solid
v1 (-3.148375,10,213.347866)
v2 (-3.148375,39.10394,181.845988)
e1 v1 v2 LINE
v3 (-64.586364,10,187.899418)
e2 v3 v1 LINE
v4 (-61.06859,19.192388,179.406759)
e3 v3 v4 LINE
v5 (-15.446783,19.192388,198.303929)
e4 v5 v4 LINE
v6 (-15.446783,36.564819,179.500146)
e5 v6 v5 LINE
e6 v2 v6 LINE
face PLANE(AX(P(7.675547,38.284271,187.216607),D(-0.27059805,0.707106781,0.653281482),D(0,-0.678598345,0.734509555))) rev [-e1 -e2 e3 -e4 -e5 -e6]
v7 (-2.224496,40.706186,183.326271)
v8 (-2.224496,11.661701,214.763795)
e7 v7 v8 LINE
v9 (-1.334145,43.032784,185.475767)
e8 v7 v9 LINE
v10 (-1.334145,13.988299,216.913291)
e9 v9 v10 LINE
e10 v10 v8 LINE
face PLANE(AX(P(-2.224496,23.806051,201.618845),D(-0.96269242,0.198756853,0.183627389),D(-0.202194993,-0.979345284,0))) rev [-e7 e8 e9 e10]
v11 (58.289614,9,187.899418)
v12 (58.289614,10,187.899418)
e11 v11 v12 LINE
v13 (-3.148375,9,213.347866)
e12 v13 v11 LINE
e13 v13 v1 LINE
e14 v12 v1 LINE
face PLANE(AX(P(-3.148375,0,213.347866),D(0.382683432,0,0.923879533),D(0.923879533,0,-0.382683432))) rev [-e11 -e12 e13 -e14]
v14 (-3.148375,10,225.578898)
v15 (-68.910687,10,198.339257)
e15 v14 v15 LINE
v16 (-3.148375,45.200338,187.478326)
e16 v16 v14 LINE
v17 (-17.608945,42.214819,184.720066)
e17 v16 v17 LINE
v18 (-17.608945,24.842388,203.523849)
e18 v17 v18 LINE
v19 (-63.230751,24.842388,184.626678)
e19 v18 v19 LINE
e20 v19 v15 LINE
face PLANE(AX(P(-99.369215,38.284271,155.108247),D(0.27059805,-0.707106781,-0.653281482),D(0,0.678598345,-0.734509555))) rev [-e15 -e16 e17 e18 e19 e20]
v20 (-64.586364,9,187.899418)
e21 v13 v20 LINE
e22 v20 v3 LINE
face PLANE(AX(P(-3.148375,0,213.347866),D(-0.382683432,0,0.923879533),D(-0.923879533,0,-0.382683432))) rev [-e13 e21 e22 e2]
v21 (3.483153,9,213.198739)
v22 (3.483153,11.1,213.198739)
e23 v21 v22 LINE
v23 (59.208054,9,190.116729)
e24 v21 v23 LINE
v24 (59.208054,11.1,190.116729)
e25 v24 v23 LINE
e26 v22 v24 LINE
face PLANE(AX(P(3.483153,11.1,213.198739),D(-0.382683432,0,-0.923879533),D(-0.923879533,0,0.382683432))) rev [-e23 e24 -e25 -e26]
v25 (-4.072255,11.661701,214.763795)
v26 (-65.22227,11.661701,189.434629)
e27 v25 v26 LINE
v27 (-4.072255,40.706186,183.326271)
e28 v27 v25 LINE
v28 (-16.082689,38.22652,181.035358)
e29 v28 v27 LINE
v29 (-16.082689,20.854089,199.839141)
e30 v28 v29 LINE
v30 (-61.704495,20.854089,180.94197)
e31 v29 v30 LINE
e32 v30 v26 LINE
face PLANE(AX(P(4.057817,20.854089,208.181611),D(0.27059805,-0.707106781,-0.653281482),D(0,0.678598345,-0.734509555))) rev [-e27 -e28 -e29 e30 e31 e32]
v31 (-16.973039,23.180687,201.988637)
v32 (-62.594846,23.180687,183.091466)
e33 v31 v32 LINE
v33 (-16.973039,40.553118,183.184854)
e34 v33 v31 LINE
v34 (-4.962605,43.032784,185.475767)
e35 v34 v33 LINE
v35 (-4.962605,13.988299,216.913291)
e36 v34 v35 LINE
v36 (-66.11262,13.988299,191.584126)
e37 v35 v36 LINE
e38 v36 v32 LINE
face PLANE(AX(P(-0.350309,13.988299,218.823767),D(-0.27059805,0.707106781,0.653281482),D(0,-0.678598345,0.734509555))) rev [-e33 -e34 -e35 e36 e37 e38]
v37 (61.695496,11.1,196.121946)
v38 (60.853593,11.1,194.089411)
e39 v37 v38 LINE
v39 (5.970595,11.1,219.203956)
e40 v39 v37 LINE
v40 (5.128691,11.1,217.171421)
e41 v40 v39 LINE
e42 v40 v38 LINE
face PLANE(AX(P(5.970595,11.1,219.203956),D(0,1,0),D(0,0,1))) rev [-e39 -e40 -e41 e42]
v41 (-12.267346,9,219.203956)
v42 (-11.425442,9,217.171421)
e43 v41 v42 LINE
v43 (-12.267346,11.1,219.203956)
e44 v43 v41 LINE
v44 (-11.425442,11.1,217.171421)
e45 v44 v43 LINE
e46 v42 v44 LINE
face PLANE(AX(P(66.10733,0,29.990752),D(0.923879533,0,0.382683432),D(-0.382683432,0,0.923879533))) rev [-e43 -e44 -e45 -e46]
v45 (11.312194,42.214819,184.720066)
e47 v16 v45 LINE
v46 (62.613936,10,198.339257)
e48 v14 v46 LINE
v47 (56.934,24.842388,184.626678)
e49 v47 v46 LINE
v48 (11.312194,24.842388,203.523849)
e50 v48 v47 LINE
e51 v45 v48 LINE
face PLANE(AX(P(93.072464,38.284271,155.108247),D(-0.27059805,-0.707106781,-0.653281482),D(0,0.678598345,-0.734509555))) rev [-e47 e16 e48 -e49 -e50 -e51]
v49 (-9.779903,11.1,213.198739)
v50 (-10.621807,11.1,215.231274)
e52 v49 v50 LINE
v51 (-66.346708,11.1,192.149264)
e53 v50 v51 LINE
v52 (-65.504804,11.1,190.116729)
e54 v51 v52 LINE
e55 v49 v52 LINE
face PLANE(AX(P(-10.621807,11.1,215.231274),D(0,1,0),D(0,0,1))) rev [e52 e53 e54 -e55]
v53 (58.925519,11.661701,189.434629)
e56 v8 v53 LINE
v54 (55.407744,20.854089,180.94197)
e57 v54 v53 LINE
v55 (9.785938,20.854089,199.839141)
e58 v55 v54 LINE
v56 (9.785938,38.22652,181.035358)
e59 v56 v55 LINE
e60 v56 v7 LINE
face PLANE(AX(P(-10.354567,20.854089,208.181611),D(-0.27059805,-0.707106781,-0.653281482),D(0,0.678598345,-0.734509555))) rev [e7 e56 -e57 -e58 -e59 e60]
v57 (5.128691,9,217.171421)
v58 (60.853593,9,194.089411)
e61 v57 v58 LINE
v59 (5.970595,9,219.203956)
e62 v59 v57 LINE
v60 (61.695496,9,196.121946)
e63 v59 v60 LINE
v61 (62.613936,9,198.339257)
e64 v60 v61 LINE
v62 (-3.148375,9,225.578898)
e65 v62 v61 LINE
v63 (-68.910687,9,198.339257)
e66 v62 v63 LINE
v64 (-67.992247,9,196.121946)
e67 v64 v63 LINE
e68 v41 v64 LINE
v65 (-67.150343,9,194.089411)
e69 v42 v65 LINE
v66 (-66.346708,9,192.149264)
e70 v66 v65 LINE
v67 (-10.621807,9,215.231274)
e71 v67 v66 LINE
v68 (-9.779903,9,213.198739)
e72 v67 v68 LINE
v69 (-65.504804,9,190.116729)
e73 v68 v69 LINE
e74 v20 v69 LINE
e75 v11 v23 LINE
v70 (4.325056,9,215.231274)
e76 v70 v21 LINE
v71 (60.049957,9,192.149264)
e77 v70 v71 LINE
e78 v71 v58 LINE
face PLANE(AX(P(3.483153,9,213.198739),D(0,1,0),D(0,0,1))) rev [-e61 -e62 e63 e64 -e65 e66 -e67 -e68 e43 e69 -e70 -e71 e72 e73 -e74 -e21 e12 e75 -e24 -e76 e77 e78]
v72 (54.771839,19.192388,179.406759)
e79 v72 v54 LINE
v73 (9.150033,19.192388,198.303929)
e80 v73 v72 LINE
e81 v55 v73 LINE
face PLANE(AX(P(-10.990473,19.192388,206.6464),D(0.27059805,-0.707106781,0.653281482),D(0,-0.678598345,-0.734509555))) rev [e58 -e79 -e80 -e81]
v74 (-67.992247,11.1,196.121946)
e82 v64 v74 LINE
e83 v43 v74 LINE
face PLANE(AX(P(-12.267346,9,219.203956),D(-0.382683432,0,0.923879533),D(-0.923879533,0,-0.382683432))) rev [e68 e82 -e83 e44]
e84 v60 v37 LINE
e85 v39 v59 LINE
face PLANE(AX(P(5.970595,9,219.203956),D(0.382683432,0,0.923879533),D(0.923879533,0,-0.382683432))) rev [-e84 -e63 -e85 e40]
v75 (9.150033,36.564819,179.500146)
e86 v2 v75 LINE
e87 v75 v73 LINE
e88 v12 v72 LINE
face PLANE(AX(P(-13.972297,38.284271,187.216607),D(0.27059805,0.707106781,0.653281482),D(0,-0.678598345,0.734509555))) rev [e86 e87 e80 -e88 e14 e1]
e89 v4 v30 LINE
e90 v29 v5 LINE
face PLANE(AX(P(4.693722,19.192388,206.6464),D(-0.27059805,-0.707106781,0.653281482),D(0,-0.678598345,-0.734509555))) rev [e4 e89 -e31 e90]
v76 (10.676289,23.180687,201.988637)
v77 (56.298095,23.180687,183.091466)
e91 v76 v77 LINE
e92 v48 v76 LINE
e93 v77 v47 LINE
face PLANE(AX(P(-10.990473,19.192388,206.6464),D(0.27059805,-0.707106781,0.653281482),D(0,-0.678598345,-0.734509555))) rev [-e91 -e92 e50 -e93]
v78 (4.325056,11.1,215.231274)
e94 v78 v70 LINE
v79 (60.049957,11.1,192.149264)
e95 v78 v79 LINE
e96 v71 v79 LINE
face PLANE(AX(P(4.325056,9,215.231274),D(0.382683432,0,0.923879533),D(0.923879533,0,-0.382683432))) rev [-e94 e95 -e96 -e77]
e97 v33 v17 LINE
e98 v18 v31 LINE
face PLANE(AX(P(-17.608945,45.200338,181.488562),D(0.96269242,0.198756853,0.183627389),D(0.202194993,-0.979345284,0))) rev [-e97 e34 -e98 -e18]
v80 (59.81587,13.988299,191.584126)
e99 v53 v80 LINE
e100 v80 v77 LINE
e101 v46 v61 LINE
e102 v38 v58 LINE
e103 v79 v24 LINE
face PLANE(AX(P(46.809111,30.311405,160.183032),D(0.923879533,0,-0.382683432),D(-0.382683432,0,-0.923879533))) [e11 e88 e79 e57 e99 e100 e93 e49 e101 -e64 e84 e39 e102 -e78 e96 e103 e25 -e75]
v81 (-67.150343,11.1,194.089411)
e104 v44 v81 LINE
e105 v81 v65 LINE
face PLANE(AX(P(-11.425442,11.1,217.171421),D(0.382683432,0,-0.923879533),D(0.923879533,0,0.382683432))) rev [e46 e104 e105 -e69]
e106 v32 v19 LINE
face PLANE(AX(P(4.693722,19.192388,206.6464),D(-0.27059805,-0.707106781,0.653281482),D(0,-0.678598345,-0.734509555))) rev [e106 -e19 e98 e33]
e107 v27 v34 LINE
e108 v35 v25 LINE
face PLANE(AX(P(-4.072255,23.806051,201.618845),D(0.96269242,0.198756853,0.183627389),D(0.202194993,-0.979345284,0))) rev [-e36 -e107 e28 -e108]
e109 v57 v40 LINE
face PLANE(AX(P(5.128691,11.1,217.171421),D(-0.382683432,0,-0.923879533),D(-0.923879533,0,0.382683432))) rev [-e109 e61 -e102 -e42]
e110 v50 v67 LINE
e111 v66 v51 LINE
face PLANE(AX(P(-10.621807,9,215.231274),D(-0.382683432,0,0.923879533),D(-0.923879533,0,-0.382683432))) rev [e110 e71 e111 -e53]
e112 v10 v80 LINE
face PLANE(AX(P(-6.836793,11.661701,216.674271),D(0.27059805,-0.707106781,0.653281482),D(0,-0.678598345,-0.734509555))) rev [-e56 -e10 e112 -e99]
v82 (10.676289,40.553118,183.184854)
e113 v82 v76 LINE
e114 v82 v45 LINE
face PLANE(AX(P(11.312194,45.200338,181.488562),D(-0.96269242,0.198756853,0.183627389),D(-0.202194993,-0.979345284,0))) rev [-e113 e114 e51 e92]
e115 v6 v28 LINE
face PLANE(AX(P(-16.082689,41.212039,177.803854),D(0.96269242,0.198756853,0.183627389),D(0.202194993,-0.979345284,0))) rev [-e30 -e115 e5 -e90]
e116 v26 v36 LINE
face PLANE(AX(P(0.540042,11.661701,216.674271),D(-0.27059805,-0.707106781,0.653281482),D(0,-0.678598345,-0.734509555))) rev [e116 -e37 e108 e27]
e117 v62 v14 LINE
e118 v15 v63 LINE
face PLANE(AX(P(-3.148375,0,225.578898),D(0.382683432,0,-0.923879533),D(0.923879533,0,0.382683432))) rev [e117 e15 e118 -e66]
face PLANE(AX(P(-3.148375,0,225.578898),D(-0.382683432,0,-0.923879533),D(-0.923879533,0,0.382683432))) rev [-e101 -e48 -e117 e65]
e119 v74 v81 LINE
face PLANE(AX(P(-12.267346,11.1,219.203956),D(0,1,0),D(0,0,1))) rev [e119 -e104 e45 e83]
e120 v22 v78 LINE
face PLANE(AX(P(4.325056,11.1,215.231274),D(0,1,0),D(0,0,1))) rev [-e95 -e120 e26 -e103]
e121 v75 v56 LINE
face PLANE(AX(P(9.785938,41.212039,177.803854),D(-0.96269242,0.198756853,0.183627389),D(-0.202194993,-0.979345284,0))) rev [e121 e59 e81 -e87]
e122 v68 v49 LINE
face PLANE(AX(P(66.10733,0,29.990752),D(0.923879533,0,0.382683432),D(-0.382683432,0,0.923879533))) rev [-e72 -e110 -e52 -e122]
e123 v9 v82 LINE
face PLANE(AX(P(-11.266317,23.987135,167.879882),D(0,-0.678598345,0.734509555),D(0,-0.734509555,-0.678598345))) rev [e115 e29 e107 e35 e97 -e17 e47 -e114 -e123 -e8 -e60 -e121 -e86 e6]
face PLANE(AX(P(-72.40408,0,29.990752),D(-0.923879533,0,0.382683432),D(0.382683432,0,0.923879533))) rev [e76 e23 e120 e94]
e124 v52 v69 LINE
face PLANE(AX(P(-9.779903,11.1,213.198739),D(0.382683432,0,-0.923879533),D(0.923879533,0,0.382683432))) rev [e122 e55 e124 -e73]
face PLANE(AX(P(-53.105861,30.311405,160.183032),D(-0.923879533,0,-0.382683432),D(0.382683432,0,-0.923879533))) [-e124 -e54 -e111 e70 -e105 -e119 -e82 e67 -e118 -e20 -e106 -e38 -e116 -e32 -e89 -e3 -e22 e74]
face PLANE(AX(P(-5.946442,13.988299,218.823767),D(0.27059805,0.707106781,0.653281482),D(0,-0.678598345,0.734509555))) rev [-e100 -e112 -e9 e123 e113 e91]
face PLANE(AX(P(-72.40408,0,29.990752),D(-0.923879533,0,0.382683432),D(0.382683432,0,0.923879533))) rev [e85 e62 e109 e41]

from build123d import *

# Parameters (mm, degrees)
SKETCH1_W                = 214.089522673
SKETCH1_H                = 271.033566845
BOSS_EXTRUDE1_DEPTH      = 10
SKETCH3_W                = 107.044761337
SKETCH3_H                = 271.033566845
CUT_EXTRUDE1_DEPTH       = 252.253590179
CUT_EXTRUDE2_DEPTH       = 249.55642867
BOSS_EXTRUDE3_DEPTH      = 40
CUT_EXTRUDE3_START       = -165.689856025
CUT_EXTRUDE3_DEPTH       = 205.862728092
CUT_EXTRUDE4_DEPTH       = 250.960593361
CUT_EXTRUDE5_DEPTH       = 250.960593361
BOSS_EXTRUDE5_DEPTH      = 45
CUT_EXTRUDE7_DEPTH       = 253.784190336
CUT_EXTRUDE9_DEPTH       = 253.784190336
CUT_EXTRUDE10_DEPTH      = 105
BOSS_EXTRUDE6_DEPTH      = 13.546139965
BOSS_EXTRUDE7_DEPTH      = 30
CUT_EXTRUDE12_DEPTH      = 30
SKETCH30_W               = 11.3
SKETCH30_H               = 54
CUT_EXTRUDE13_DEPTH      = 30
CUT_EXTRUDE14_DEPTH      = 30
CUT_EXTRUDE14_DEPTH_BACK = 101.665148292
SKETCH31_W               = 44.683801498
SKETCH31_H               = 21.311404518


with BuildPart() as part:
    # Sketch1 → Boss-Extrude1 (new body)
    with BuildSketch(Plane(origin=(0, 0, 0), x_dir=(1, 0, 0), z_dir=(0, 1, 0))):
        with Locations((-3.148375333, -90.062114546)):
            Rectangle(SKETCH1_W, SKETCH1_H)
    extrude(amount=BOSS_EXTRUDE1_DEPTH)

    # Sketch3 → Cut-Extrude1 (cut, through all)
    with BuildSketch(Plane(origin=(0, 10, 0), x_dir=(1, 0, 0), z_dir=(0, 1, 0))):
        with Locations((-56.670756002, -90.062114546)):
            Rectangle(SKETCH3_W, SKETCH3_H)
    extrude(amount=-CUT_EXTRUDE1_DEPTH, mode=Mode.SUBTRACT)

    # Sketch4 → Cut-Extrude2 (cut, through all)
    with BuildSketch(Plane(origin=(0, 10, 0), x_dir=(1, 0, 0), z_dir=(0, 1, 0))):
        Polygon((103.896386003, -181.239506042), (100.834918545, -173.848469781), (9.996584241, 45.454668877), (103.896386003, 45.454668877), align=None)
    extrude(amount=-CUT_EXTRUDE2_DEPTH, mode=Mode.SUBTRACT)

    # Sketch6 → Boss-Extrude3 (add, along a direction that is not the sketch's normal)
    with BuildSketch(Plane(origin=(0, 10, 0), x_dir=(1, 0, 0), z_dir=(0, 1, 0))):
        Polygon((99.572063218, -170.799667324), (103.896386003, -181.239506042), (-3.148375333, -225.578897968), (-3.148375333, -213.347866105), align=None)
    extrude(amount=BOSS_EXTRUDE3_DEPTH, dir=(-0.2705980500730979, 0.7071067811865489, -0.6532814824381872))

    # Cut-Extrude3: read off the stored shape, not the designer's step
    # Cut-Extrude3 outline → Cut-Extrude3 (cut)
    with BuildSketch(Plane(origin=(0, 0, 0), x_dir=(1, 0, 0), z_dir=(0, 0.6785983445458481, -0.7345095552677544)).offset(CUT_EXTRUDE3_START)):
        Polygon((-3.148375333, -165), (-3.148375333, -152.122604304), (-13.972297336, -155.165042499), (-15, -155.45391393), (-15, -165), align=None)
    extrude(amount=CUT_EXTRUDE3_DEPTH, mode=Mode.SUBTRACT)

    # Sketch8 → Cut-Extrude4 (cut, through all)
    with BuildSketch(Plane(origin=(0, 10, 0), x_dir=(1, 0, 0), z_dir=(0, 1, 0))):
        Polygon((-3.148375333, -225.578897968), (103.896386003, -181.239506042), (103.896386003, -225.578897968), align=None)
    extrude(amount=-CUT_EXTRUDE4_DEPTH, mode=Mode.SUBTRACT)

    # Sketch9 → Cut-Extrude5 (cut, through all)
    with BuildSketch(Plane(origin=(0, 10, 0), x_dir=(1, 0, 0), z_dir=(0, 1, 0))):
        Polygon((-3.148375333, -213.347866105), (99.572063218, -170.799667324), (9.996584241, 45.454668877), (-3.148375333, 45.454668877), align=None)
    extrude(amount=-CUT_EXTRUDE5_DEPTH, mode=Mode.SUBTRACT)

    # Sketch13 → Boss-Extrude5 (add)
    with BuildSketch(Plane.XZ):
        Polygon((-3.148375333, 225.578897968), (-3.148375333, 213.347866105), (99.572063218, 170.799667324), (103.896386003, 181.239506042), align=None)
    extrude(amount=BOSS_EXTRUDE5_DEPTH)

    # Sketch14 → Cut-Extrude7 (cut, through all)
    with BuildSketch(Plane(origin=(24.603270673, 0, -10.191008392), x_dir=(-0.38268343236508967, 0, -0.9238795325112868), z_dir=(0.9238795325112867, 0, -0.3826834323650896))):
        Polygon((-178.918624473, 38.284271247), (-173.268624473, 32.634271247), (-167.618624473, 38.284271247), align=None)
    extrude(amount=-CUT_EXTRUDE7_DEPTH, mode=Mode.SUBTRACT)

    # Sketch21 → Cut-Extrude9 (cut, through all)
    with BuildSketch(Plane(origin=(24.603270673, 0, -10.191008392), x_dir=(-0.38268343236508967, 0, -0.9238795325112868), z_dir=(0.9238795325112867, 0, -0.3826834323650896))):
        Polygon((-178.918624473, 38.284271247), (-173.268624473, 32.634271247), (-186.710507565, 19.192388155), (-188.372208501, 20.854089091), (-197.564596656, 11.661700936), (-199.891194785, 13.988299064), (-190.698806629, 23.18068722), (-192.360507565, 24.842388155), align=None)
    extrude(amount=-CUT_EXTRUDE9_DEPTH, mode=Mode.SUBTRACT)

    # Sketch26 → Cut-Extrude10 (cut)
    with BuildSketch(Plane(origin=(24.603270673, 0, -10.191008392), x_dir=(-0.38268343236508967, 0, -0.9238795325112868), z_dir=(0.9238795325112867, 0, -0.3826834323650896))):
        Polygon((-195.90289572, 9), (-195.90289572, -45), (-207.20289572, -45), (-207.20289572, 9), (-204.80289572, 9), (-204.80289572, 11.1), (-202.60289572, 11.1), (-202.60289572, 9), (-200.50289572, 9), (-200.50289572, 11.1), (-198.30289572, 11.1), (-198.30289572, 9), align=None)
    extrude(amount=-CUT_EXTRUDE10_DEPTH, mode=Mode.SUBTRACT)

    # Sketch27 → Boss-Extrude6 (add, along a direction that is not the sketch's normal)
    with BuildSketch(Plane(origin=(35.57097911, -92.95144786, 85.875940195), x_dir=(0.9626924198811571, 0.19875685341551327, -0.18362738881693624), z_dir=(-0.2705980500730966, 0.7071067811865525, -0.6532814824381838))):
        Polygon((-40.219860097, -165.940754997), (-39.260177115, -165.659670359), (-38.335322468, -168.817321636), (-40.219860097, -169.369289928), align=None)
    extrude(amount=BOSS_EXTRUDE6_DEPTH, dir=(0, 0.6785983445458494, -0.7345095552677533))

    # Sketch28 → Boss-Extrude7 (add, along a direction that is not the sketch's normal)
    with BuildSketch(Plane(origin=(32.053204459, -83.759059705, 77.383280924), x_dir=(0.9626924198811573, 0.1987568534155131, -0.18362738881693524), z_dir=(-0.27059805007309584, 0.7071067811865541, -0.6532814824381823))):
        Polygon((-23.130198055, -160.935308873), (-23.790746954, -158.680053865), (-36.565759807, -162.4217685), (-36.565759807, -170.747754034), (-21.54479451, -166.348215158), (-22.205343409, -164.09296015), (-34.681222178, -167.74706044), (-35.606076824, -164.589409163), align=None)
    extrude(amount=BOSS_EXTRUDE7_DEPTH, dir=(0, 0.6785983445458483, -0.7345095552677544))

    # Sketch29 → Cut-Extrude12 (cut)
    with BuildSketch(Plane(origin=(41.559974827, 108.60144786, 100.334654879), x_dir=(0.9626924198811563, -0.1987568534155138, -0.18362738881693985), z_dir=(0.2705980500730995, 0.7071067811865461, 0.6532814824381895))):
        Polygon((-46.440949609, -107.03174708), (-31.419984312, -107.03174708), (-31.419984312, -102.632208204), align=None)
    extrude(amount=-CUT_EXTRUDE12_DEPTH, mode=Mode.SUBTRACT)

    # Sketch30 → Cut-Extrude13 (cut)
    with BuildSketch(Plane(origin=(-72.40408024, 0, 29.990752007), x_dir=(-0.3826834323650857, 0, -0.9238795325112884), z_dir=(0.9238795325112884, 0, -0.3826834323650857))):
        with Locations((-201.55289572, -18)):
            Rectangle(SKETCH30_W, SKETCH30_H)
    extrude(amount=-CUT_EXTRUDE13_DEPTH, mode=Mode.SUBTRACT)

    # Sketch31 → Cut-Extrude14 (cut, two sides: drawn at the far end of the back side and taken through both)
    with BuildSketch(Plane(origin=(74.968792545, 0, 180.990675716), x_dir=(-0.9238795325112865, 0, 0.38268343236509056), z_dir=(-0.38268343236509056, 0, -0.9238795325112865)).offset(-CUT_EXTRUDE14_DEPTH_BACK)):
        with Locations((-4.288487529, 19.655702259)):
            Rectangle(SKETCH31_W, SKETCH31_H)
    extrude(amount=CUT_EXTRUDE14_DEPTH + CUT_EXTRUDE14_DEPTH_BACK, mode=Mode.SUBTRACT)

    # Mirror4: part across plane


with BuildPart() as part_1:
    add(part.part)
    add(part.part.mirror(Plane(origin=(-3.148375333, 0, 225.578897968), x_dir=(0, 0, 1), z_dir=(1, 0, 0))))


solid = part_1.part
